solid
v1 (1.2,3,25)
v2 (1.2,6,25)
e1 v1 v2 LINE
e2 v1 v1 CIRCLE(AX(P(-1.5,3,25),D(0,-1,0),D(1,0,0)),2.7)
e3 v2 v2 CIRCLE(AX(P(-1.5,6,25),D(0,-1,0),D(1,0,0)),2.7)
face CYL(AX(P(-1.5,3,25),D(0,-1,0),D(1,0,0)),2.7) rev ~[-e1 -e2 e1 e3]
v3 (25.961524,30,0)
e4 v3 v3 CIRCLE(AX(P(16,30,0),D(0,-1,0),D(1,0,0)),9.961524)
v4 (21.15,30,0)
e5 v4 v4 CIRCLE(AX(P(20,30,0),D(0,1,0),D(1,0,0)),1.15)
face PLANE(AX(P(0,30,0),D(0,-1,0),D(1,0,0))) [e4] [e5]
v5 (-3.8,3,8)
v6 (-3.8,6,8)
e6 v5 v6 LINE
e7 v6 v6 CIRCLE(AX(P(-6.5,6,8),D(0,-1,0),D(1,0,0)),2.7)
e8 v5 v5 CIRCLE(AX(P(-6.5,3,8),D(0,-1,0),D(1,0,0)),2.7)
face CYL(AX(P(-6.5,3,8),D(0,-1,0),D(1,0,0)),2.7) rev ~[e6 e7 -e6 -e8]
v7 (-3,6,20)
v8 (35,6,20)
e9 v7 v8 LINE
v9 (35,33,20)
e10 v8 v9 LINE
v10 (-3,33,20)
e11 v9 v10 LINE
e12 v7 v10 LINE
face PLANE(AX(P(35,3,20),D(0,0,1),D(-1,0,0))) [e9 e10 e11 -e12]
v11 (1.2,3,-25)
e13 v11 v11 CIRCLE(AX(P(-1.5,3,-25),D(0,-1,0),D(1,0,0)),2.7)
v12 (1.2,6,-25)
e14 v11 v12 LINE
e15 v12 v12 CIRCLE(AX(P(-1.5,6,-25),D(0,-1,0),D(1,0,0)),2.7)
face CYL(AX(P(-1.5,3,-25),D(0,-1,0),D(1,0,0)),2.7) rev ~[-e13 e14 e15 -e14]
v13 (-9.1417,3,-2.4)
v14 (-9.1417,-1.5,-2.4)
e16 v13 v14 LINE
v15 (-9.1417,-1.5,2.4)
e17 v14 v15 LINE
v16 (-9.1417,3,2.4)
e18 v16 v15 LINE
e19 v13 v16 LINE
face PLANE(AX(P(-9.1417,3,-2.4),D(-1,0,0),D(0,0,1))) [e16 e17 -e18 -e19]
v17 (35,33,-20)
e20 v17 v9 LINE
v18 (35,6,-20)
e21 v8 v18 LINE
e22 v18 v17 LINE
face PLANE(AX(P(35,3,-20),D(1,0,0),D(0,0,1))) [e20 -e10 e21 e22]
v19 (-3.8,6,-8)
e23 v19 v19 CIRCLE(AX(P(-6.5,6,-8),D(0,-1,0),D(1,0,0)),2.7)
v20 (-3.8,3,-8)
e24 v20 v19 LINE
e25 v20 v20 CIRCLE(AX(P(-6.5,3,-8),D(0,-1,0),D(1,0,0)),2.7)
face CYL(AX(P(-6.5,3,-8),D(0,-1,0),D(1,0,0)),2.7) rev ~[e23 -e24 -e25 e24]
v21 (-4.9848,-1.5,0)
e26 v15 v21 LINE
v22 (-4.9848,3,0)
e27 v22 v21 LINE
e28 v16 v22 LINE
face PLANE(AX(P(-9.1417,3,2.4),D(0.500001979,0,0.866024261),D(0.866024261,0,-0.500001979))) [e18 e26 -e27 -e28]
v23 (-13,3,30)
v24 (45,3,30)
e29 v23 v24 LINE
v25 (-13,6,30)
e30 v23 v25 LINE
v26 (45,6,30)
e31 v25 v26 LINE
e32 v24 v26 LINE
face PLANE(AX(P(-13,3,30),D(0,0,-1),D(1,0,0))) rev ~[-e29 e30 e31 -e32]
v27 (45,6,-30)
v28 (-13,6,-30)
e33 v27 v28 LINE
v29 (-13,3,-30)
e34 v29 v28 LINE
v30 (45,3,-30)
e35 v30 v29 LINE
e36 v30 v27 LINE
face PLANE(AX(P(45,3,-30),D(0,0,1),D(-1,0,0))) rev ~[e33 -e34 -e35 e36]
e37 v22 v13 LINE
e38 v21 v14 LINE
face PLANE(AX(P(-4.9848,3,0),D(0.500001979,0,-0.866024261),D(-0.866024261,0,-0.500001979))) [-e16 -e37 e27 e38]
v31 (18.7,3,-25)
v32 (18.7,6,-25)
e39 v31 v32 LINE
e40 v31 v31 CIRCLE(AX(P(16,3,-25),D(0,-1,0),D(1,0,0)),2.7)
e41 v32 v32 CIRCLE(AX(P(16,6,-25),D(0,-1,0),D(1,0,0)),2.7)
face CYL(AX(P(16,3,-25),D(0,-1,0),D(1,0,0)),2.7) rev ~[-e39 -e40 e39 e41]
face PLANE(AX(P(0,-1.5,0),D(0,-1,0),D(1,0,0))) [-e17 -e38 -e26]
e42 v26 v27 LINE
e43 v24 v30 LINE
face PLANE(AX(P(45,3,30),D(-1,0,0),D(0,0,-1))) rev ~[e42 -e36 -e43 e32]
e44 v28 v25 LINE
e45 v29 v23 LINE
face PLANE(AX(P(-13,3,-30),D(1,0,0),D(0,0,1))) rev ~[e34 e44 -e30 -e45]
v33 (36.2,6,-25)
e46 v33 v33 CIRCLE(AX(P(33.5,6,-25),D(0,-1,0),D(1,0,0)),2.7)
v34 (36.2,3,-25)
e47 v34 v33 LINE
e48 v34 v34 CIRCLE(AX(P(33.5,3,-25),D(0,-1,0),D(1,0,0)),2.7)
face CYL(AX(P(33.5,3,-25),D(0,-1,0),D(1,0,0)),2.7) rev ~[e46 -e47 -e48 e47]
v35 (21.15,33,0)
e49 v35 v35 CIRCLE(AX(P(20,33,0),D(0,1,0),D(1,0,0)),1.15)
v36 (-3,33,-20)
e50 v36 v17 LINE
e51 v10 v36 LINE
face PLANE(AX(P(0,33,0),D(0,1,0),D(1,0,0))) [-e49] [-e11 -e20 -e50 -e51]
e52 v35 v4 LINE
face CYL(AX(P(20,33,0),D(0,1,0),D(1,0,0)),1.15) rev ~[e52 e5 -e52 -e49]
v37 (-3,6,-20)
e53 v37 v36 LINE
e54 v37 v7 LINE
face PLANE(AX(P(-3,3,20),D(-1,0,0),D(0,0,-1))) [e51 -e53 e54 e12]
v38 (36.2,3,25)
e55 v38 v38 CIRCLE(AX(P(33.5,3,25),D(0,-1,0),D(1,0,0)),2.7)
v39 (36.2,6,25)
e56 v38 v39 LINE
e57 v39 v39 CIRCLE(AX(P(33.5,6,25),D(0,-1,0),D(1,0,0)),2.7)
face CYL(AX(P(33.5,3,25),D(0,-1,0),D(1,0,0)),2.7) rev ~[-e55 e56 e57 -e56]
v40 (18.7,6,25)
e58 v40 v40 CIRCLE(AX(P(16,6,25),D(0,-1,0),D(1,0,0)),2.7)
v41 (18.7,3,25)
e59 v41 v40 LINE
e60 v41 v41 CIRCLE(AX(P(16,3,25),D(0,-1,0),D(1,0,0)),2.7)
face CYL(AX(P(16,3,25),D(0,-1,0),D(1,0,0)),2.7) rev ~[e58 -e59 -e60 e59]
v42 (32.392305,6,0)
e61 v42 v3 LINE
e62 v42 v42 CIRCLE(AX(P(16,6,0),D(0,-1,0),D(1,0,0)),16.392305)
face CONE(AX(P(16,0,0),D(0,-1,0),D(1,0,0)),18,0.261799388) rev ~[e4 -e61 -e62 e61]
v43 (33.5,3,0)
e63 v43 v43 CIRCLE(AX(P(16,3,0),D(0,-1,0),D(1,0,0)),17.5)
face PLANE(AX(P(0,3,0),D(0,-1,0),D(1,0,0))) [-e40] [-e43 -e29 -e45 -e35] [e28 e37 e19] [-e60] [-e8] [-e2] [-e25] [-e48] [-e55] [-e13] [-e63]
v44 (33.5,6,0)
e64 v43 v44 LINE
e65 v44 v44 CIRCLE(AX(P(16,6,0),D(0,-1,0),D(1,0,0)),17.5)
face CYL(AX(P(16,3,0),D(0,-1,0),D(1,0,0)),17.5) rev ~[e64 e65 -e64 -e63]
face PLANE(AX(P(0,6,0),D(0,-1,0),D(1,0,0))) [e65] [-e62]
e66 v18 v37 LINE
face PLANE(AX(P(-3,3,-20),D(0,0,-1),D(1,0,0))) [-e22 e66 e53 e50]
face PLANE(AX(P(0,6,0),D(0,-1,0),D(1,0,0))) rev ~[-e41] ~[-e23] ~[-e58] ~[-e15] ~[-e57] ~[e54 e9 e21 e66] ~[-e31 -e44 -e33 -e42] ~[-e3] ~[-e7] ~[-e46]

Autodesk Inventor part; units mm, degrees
ref_plane "YZ Plane" through (0, 0, 0) normal (1, 0, 0) x (0, 1, 0)
ref_plane "XZ Plane" through (0, 0, 0) normal (0, 1, 0) x (-1, 0, 0)
ref_plane "XY Plane" through (0, 0, 0) normal (0, 0, 1) x (1, 0, 0)
ref_plane "Work Plane5" through (0, 3, 0) normal (0, 1, 0) x (1, 0, 0)
sketch "Sketch45" plane through (0, 3, 0) normal (0, 1, 0) x (1, 0, 0)
  line L0 (35, -20) -> (-3, -20)
  line L1 (-3, -20) -> (-3, 20)
  line L2 (-3, 20) -> (35, 20)
  line L3 (35, 20) -> (35, -20)
  point P0 (0, 0)
  dimension "d142" = 38
  dimension "d143" = 40
extrude "Extrusion34" add sketch "Sketch45" along normal blind 30
ref_plane "Work Plane2" through (0, 0, 0) normal (0, -1, 0) x (1, 0, 0)
sketch "Sketch47" plane through (0, 0, 0) normal (0, -1, 0) x (1, 0, 0)
  circle A0 centre (16, 0) radius 18
  point P0 (0, 0)
  dimension "d146" = 36
extrude "Extrusion35" cut sketch "Sketch47" against normal blind 30 draft -15
ref_plane "Work Plane1" through (0, 3, 0) normal (0, 1, 0) x (1, 0, 0)
sketch "Sketch74" plane through (0, 33, 0) normal (0, 1, 0) x (1, 0, 0)
  circle A0 centre (20, 0) radius 1.15
  point P0 (0, 0)
  dimension "d210" = 2.3
extrude "Extrusion51" cut sketch "Sketch74" against normal blind 10
sketch "Sketch77" plane through (0, 3, 0) normal (0, -1, 0) x (1, 0, 0)
  circle A0 centre (16, 0) radius 17.5
  point P0 (0, 0)
  dimension "d219" = 35
sketch "Sketch78" plane through (0, 3, 0) normal (0, -1, 0) x (1, 0, 0)
  line L0 (45, -30) -> (-13, -30)
  line L1 (-13, -30) -> (-13, 30)
  line L2 (-13, 30) -> (45, 30)
  line L3 (45, 30) -> (45, -30)
  line L4 (45, -30) -> (-13, 30) construction
  line L5 (-13, -30) -> (45, 30) construction
  point P0 (0, 0)
  point P1 (16, 0)
  dimension "d220" = 58
  dimension "d221" = 60
extrude "Extrusion53" add sketch "Sketch78" against normal blind 3
extrude "Extrusion54" cut sketch "Sketch77" against normal blind 3
sketch "Sketch81" plane through (0, 3, 0) normal (0, -1, 0) x (1, 0, 0)
  circle A0 centre (33.5, -25) radius 2.7
  line L0 (-13, -30) -> (45, -30) projected
  line L1 (45, -30) -> (45, 30) projected
  circle A1 centre (16, -25) radius 2.7
  circle A2 centre (-1.5, -25) radius 2.7
  circle A3 centre (-6.5, -8) radius 2.7
  circle A4 centre (-6.5, 8) radius 2.7
  circle A5 centre (-1.5, 25) radius 2.7
  circle A6 centre (16, 25) radius 2.7
  circle A7 centre (33.5, 25) radius 2.7
  point P0 (0, 0)
  dimension "mag_D" = 5.4
  dimension "d232" = 5
  dimension "d233" = 11.5
  dimension "d234" = 5.4
  dimension "d235" = 17.5
  dimension "d236" = 5.4
  dimension "d237" = 17.5
  dimension "d238" = 5.4
  dimension "d239" = 5
  dimension "d240" = 17
  dimension "d241" = 5.4
  dimension "d242" = 16
  dimension "d243" = 5.4
  dimension "d244" = 17
  dimension "d245" = 5.4
  dimension "d246" = 17.5
  dimension "d247" = 5.4
  dimension "d248" = 17.5
  dimension "d249" = 5
extrude "Extrusion56" cut sketch "Sketch81" against normal blind 30
sketch "Sketch83" plane through (0, 3, 0) normal (0, -1, 0) x (1, 0, 0)
  circle A0 centre (-6.5, -8) radius 2.7 projected
  line L0 (-9.1417, -2.4) -> (-9.1417, 2.4)
  line L1 (-9.1417, 2.4) -> (-4.9848, 0)
  line L2 (-4.9848, 0) -> (-9.1417, -2.4)
  point P0 (0, 0)
  point P1 (-9.1417, -8.5581)
  point P2 (-7.756, 0)
  dimension "d253" = 4.8
extrude "Extrusion57" add sketch "Sketch83" along normal blind 4.5 contours L0 L1 L2
equation "\"d234\" = mag_D"
equation "\"d236\" = mag_D"
equation "\"d237\" = d235"
equation "\"d238\" = mag_D"
equation "\"d241\" = mag_D"
equation "\"d243\" = mag_D"
equation "\"d244\" = d240"
equation "\"d245\" = mag_D"
equation "\"d246\" = d235"
equation "\"d247\" = mag_D"
equation "\"d248\" = d235"
equation "\"d249\" = d239"
properties part number "liquid_port_v03"
